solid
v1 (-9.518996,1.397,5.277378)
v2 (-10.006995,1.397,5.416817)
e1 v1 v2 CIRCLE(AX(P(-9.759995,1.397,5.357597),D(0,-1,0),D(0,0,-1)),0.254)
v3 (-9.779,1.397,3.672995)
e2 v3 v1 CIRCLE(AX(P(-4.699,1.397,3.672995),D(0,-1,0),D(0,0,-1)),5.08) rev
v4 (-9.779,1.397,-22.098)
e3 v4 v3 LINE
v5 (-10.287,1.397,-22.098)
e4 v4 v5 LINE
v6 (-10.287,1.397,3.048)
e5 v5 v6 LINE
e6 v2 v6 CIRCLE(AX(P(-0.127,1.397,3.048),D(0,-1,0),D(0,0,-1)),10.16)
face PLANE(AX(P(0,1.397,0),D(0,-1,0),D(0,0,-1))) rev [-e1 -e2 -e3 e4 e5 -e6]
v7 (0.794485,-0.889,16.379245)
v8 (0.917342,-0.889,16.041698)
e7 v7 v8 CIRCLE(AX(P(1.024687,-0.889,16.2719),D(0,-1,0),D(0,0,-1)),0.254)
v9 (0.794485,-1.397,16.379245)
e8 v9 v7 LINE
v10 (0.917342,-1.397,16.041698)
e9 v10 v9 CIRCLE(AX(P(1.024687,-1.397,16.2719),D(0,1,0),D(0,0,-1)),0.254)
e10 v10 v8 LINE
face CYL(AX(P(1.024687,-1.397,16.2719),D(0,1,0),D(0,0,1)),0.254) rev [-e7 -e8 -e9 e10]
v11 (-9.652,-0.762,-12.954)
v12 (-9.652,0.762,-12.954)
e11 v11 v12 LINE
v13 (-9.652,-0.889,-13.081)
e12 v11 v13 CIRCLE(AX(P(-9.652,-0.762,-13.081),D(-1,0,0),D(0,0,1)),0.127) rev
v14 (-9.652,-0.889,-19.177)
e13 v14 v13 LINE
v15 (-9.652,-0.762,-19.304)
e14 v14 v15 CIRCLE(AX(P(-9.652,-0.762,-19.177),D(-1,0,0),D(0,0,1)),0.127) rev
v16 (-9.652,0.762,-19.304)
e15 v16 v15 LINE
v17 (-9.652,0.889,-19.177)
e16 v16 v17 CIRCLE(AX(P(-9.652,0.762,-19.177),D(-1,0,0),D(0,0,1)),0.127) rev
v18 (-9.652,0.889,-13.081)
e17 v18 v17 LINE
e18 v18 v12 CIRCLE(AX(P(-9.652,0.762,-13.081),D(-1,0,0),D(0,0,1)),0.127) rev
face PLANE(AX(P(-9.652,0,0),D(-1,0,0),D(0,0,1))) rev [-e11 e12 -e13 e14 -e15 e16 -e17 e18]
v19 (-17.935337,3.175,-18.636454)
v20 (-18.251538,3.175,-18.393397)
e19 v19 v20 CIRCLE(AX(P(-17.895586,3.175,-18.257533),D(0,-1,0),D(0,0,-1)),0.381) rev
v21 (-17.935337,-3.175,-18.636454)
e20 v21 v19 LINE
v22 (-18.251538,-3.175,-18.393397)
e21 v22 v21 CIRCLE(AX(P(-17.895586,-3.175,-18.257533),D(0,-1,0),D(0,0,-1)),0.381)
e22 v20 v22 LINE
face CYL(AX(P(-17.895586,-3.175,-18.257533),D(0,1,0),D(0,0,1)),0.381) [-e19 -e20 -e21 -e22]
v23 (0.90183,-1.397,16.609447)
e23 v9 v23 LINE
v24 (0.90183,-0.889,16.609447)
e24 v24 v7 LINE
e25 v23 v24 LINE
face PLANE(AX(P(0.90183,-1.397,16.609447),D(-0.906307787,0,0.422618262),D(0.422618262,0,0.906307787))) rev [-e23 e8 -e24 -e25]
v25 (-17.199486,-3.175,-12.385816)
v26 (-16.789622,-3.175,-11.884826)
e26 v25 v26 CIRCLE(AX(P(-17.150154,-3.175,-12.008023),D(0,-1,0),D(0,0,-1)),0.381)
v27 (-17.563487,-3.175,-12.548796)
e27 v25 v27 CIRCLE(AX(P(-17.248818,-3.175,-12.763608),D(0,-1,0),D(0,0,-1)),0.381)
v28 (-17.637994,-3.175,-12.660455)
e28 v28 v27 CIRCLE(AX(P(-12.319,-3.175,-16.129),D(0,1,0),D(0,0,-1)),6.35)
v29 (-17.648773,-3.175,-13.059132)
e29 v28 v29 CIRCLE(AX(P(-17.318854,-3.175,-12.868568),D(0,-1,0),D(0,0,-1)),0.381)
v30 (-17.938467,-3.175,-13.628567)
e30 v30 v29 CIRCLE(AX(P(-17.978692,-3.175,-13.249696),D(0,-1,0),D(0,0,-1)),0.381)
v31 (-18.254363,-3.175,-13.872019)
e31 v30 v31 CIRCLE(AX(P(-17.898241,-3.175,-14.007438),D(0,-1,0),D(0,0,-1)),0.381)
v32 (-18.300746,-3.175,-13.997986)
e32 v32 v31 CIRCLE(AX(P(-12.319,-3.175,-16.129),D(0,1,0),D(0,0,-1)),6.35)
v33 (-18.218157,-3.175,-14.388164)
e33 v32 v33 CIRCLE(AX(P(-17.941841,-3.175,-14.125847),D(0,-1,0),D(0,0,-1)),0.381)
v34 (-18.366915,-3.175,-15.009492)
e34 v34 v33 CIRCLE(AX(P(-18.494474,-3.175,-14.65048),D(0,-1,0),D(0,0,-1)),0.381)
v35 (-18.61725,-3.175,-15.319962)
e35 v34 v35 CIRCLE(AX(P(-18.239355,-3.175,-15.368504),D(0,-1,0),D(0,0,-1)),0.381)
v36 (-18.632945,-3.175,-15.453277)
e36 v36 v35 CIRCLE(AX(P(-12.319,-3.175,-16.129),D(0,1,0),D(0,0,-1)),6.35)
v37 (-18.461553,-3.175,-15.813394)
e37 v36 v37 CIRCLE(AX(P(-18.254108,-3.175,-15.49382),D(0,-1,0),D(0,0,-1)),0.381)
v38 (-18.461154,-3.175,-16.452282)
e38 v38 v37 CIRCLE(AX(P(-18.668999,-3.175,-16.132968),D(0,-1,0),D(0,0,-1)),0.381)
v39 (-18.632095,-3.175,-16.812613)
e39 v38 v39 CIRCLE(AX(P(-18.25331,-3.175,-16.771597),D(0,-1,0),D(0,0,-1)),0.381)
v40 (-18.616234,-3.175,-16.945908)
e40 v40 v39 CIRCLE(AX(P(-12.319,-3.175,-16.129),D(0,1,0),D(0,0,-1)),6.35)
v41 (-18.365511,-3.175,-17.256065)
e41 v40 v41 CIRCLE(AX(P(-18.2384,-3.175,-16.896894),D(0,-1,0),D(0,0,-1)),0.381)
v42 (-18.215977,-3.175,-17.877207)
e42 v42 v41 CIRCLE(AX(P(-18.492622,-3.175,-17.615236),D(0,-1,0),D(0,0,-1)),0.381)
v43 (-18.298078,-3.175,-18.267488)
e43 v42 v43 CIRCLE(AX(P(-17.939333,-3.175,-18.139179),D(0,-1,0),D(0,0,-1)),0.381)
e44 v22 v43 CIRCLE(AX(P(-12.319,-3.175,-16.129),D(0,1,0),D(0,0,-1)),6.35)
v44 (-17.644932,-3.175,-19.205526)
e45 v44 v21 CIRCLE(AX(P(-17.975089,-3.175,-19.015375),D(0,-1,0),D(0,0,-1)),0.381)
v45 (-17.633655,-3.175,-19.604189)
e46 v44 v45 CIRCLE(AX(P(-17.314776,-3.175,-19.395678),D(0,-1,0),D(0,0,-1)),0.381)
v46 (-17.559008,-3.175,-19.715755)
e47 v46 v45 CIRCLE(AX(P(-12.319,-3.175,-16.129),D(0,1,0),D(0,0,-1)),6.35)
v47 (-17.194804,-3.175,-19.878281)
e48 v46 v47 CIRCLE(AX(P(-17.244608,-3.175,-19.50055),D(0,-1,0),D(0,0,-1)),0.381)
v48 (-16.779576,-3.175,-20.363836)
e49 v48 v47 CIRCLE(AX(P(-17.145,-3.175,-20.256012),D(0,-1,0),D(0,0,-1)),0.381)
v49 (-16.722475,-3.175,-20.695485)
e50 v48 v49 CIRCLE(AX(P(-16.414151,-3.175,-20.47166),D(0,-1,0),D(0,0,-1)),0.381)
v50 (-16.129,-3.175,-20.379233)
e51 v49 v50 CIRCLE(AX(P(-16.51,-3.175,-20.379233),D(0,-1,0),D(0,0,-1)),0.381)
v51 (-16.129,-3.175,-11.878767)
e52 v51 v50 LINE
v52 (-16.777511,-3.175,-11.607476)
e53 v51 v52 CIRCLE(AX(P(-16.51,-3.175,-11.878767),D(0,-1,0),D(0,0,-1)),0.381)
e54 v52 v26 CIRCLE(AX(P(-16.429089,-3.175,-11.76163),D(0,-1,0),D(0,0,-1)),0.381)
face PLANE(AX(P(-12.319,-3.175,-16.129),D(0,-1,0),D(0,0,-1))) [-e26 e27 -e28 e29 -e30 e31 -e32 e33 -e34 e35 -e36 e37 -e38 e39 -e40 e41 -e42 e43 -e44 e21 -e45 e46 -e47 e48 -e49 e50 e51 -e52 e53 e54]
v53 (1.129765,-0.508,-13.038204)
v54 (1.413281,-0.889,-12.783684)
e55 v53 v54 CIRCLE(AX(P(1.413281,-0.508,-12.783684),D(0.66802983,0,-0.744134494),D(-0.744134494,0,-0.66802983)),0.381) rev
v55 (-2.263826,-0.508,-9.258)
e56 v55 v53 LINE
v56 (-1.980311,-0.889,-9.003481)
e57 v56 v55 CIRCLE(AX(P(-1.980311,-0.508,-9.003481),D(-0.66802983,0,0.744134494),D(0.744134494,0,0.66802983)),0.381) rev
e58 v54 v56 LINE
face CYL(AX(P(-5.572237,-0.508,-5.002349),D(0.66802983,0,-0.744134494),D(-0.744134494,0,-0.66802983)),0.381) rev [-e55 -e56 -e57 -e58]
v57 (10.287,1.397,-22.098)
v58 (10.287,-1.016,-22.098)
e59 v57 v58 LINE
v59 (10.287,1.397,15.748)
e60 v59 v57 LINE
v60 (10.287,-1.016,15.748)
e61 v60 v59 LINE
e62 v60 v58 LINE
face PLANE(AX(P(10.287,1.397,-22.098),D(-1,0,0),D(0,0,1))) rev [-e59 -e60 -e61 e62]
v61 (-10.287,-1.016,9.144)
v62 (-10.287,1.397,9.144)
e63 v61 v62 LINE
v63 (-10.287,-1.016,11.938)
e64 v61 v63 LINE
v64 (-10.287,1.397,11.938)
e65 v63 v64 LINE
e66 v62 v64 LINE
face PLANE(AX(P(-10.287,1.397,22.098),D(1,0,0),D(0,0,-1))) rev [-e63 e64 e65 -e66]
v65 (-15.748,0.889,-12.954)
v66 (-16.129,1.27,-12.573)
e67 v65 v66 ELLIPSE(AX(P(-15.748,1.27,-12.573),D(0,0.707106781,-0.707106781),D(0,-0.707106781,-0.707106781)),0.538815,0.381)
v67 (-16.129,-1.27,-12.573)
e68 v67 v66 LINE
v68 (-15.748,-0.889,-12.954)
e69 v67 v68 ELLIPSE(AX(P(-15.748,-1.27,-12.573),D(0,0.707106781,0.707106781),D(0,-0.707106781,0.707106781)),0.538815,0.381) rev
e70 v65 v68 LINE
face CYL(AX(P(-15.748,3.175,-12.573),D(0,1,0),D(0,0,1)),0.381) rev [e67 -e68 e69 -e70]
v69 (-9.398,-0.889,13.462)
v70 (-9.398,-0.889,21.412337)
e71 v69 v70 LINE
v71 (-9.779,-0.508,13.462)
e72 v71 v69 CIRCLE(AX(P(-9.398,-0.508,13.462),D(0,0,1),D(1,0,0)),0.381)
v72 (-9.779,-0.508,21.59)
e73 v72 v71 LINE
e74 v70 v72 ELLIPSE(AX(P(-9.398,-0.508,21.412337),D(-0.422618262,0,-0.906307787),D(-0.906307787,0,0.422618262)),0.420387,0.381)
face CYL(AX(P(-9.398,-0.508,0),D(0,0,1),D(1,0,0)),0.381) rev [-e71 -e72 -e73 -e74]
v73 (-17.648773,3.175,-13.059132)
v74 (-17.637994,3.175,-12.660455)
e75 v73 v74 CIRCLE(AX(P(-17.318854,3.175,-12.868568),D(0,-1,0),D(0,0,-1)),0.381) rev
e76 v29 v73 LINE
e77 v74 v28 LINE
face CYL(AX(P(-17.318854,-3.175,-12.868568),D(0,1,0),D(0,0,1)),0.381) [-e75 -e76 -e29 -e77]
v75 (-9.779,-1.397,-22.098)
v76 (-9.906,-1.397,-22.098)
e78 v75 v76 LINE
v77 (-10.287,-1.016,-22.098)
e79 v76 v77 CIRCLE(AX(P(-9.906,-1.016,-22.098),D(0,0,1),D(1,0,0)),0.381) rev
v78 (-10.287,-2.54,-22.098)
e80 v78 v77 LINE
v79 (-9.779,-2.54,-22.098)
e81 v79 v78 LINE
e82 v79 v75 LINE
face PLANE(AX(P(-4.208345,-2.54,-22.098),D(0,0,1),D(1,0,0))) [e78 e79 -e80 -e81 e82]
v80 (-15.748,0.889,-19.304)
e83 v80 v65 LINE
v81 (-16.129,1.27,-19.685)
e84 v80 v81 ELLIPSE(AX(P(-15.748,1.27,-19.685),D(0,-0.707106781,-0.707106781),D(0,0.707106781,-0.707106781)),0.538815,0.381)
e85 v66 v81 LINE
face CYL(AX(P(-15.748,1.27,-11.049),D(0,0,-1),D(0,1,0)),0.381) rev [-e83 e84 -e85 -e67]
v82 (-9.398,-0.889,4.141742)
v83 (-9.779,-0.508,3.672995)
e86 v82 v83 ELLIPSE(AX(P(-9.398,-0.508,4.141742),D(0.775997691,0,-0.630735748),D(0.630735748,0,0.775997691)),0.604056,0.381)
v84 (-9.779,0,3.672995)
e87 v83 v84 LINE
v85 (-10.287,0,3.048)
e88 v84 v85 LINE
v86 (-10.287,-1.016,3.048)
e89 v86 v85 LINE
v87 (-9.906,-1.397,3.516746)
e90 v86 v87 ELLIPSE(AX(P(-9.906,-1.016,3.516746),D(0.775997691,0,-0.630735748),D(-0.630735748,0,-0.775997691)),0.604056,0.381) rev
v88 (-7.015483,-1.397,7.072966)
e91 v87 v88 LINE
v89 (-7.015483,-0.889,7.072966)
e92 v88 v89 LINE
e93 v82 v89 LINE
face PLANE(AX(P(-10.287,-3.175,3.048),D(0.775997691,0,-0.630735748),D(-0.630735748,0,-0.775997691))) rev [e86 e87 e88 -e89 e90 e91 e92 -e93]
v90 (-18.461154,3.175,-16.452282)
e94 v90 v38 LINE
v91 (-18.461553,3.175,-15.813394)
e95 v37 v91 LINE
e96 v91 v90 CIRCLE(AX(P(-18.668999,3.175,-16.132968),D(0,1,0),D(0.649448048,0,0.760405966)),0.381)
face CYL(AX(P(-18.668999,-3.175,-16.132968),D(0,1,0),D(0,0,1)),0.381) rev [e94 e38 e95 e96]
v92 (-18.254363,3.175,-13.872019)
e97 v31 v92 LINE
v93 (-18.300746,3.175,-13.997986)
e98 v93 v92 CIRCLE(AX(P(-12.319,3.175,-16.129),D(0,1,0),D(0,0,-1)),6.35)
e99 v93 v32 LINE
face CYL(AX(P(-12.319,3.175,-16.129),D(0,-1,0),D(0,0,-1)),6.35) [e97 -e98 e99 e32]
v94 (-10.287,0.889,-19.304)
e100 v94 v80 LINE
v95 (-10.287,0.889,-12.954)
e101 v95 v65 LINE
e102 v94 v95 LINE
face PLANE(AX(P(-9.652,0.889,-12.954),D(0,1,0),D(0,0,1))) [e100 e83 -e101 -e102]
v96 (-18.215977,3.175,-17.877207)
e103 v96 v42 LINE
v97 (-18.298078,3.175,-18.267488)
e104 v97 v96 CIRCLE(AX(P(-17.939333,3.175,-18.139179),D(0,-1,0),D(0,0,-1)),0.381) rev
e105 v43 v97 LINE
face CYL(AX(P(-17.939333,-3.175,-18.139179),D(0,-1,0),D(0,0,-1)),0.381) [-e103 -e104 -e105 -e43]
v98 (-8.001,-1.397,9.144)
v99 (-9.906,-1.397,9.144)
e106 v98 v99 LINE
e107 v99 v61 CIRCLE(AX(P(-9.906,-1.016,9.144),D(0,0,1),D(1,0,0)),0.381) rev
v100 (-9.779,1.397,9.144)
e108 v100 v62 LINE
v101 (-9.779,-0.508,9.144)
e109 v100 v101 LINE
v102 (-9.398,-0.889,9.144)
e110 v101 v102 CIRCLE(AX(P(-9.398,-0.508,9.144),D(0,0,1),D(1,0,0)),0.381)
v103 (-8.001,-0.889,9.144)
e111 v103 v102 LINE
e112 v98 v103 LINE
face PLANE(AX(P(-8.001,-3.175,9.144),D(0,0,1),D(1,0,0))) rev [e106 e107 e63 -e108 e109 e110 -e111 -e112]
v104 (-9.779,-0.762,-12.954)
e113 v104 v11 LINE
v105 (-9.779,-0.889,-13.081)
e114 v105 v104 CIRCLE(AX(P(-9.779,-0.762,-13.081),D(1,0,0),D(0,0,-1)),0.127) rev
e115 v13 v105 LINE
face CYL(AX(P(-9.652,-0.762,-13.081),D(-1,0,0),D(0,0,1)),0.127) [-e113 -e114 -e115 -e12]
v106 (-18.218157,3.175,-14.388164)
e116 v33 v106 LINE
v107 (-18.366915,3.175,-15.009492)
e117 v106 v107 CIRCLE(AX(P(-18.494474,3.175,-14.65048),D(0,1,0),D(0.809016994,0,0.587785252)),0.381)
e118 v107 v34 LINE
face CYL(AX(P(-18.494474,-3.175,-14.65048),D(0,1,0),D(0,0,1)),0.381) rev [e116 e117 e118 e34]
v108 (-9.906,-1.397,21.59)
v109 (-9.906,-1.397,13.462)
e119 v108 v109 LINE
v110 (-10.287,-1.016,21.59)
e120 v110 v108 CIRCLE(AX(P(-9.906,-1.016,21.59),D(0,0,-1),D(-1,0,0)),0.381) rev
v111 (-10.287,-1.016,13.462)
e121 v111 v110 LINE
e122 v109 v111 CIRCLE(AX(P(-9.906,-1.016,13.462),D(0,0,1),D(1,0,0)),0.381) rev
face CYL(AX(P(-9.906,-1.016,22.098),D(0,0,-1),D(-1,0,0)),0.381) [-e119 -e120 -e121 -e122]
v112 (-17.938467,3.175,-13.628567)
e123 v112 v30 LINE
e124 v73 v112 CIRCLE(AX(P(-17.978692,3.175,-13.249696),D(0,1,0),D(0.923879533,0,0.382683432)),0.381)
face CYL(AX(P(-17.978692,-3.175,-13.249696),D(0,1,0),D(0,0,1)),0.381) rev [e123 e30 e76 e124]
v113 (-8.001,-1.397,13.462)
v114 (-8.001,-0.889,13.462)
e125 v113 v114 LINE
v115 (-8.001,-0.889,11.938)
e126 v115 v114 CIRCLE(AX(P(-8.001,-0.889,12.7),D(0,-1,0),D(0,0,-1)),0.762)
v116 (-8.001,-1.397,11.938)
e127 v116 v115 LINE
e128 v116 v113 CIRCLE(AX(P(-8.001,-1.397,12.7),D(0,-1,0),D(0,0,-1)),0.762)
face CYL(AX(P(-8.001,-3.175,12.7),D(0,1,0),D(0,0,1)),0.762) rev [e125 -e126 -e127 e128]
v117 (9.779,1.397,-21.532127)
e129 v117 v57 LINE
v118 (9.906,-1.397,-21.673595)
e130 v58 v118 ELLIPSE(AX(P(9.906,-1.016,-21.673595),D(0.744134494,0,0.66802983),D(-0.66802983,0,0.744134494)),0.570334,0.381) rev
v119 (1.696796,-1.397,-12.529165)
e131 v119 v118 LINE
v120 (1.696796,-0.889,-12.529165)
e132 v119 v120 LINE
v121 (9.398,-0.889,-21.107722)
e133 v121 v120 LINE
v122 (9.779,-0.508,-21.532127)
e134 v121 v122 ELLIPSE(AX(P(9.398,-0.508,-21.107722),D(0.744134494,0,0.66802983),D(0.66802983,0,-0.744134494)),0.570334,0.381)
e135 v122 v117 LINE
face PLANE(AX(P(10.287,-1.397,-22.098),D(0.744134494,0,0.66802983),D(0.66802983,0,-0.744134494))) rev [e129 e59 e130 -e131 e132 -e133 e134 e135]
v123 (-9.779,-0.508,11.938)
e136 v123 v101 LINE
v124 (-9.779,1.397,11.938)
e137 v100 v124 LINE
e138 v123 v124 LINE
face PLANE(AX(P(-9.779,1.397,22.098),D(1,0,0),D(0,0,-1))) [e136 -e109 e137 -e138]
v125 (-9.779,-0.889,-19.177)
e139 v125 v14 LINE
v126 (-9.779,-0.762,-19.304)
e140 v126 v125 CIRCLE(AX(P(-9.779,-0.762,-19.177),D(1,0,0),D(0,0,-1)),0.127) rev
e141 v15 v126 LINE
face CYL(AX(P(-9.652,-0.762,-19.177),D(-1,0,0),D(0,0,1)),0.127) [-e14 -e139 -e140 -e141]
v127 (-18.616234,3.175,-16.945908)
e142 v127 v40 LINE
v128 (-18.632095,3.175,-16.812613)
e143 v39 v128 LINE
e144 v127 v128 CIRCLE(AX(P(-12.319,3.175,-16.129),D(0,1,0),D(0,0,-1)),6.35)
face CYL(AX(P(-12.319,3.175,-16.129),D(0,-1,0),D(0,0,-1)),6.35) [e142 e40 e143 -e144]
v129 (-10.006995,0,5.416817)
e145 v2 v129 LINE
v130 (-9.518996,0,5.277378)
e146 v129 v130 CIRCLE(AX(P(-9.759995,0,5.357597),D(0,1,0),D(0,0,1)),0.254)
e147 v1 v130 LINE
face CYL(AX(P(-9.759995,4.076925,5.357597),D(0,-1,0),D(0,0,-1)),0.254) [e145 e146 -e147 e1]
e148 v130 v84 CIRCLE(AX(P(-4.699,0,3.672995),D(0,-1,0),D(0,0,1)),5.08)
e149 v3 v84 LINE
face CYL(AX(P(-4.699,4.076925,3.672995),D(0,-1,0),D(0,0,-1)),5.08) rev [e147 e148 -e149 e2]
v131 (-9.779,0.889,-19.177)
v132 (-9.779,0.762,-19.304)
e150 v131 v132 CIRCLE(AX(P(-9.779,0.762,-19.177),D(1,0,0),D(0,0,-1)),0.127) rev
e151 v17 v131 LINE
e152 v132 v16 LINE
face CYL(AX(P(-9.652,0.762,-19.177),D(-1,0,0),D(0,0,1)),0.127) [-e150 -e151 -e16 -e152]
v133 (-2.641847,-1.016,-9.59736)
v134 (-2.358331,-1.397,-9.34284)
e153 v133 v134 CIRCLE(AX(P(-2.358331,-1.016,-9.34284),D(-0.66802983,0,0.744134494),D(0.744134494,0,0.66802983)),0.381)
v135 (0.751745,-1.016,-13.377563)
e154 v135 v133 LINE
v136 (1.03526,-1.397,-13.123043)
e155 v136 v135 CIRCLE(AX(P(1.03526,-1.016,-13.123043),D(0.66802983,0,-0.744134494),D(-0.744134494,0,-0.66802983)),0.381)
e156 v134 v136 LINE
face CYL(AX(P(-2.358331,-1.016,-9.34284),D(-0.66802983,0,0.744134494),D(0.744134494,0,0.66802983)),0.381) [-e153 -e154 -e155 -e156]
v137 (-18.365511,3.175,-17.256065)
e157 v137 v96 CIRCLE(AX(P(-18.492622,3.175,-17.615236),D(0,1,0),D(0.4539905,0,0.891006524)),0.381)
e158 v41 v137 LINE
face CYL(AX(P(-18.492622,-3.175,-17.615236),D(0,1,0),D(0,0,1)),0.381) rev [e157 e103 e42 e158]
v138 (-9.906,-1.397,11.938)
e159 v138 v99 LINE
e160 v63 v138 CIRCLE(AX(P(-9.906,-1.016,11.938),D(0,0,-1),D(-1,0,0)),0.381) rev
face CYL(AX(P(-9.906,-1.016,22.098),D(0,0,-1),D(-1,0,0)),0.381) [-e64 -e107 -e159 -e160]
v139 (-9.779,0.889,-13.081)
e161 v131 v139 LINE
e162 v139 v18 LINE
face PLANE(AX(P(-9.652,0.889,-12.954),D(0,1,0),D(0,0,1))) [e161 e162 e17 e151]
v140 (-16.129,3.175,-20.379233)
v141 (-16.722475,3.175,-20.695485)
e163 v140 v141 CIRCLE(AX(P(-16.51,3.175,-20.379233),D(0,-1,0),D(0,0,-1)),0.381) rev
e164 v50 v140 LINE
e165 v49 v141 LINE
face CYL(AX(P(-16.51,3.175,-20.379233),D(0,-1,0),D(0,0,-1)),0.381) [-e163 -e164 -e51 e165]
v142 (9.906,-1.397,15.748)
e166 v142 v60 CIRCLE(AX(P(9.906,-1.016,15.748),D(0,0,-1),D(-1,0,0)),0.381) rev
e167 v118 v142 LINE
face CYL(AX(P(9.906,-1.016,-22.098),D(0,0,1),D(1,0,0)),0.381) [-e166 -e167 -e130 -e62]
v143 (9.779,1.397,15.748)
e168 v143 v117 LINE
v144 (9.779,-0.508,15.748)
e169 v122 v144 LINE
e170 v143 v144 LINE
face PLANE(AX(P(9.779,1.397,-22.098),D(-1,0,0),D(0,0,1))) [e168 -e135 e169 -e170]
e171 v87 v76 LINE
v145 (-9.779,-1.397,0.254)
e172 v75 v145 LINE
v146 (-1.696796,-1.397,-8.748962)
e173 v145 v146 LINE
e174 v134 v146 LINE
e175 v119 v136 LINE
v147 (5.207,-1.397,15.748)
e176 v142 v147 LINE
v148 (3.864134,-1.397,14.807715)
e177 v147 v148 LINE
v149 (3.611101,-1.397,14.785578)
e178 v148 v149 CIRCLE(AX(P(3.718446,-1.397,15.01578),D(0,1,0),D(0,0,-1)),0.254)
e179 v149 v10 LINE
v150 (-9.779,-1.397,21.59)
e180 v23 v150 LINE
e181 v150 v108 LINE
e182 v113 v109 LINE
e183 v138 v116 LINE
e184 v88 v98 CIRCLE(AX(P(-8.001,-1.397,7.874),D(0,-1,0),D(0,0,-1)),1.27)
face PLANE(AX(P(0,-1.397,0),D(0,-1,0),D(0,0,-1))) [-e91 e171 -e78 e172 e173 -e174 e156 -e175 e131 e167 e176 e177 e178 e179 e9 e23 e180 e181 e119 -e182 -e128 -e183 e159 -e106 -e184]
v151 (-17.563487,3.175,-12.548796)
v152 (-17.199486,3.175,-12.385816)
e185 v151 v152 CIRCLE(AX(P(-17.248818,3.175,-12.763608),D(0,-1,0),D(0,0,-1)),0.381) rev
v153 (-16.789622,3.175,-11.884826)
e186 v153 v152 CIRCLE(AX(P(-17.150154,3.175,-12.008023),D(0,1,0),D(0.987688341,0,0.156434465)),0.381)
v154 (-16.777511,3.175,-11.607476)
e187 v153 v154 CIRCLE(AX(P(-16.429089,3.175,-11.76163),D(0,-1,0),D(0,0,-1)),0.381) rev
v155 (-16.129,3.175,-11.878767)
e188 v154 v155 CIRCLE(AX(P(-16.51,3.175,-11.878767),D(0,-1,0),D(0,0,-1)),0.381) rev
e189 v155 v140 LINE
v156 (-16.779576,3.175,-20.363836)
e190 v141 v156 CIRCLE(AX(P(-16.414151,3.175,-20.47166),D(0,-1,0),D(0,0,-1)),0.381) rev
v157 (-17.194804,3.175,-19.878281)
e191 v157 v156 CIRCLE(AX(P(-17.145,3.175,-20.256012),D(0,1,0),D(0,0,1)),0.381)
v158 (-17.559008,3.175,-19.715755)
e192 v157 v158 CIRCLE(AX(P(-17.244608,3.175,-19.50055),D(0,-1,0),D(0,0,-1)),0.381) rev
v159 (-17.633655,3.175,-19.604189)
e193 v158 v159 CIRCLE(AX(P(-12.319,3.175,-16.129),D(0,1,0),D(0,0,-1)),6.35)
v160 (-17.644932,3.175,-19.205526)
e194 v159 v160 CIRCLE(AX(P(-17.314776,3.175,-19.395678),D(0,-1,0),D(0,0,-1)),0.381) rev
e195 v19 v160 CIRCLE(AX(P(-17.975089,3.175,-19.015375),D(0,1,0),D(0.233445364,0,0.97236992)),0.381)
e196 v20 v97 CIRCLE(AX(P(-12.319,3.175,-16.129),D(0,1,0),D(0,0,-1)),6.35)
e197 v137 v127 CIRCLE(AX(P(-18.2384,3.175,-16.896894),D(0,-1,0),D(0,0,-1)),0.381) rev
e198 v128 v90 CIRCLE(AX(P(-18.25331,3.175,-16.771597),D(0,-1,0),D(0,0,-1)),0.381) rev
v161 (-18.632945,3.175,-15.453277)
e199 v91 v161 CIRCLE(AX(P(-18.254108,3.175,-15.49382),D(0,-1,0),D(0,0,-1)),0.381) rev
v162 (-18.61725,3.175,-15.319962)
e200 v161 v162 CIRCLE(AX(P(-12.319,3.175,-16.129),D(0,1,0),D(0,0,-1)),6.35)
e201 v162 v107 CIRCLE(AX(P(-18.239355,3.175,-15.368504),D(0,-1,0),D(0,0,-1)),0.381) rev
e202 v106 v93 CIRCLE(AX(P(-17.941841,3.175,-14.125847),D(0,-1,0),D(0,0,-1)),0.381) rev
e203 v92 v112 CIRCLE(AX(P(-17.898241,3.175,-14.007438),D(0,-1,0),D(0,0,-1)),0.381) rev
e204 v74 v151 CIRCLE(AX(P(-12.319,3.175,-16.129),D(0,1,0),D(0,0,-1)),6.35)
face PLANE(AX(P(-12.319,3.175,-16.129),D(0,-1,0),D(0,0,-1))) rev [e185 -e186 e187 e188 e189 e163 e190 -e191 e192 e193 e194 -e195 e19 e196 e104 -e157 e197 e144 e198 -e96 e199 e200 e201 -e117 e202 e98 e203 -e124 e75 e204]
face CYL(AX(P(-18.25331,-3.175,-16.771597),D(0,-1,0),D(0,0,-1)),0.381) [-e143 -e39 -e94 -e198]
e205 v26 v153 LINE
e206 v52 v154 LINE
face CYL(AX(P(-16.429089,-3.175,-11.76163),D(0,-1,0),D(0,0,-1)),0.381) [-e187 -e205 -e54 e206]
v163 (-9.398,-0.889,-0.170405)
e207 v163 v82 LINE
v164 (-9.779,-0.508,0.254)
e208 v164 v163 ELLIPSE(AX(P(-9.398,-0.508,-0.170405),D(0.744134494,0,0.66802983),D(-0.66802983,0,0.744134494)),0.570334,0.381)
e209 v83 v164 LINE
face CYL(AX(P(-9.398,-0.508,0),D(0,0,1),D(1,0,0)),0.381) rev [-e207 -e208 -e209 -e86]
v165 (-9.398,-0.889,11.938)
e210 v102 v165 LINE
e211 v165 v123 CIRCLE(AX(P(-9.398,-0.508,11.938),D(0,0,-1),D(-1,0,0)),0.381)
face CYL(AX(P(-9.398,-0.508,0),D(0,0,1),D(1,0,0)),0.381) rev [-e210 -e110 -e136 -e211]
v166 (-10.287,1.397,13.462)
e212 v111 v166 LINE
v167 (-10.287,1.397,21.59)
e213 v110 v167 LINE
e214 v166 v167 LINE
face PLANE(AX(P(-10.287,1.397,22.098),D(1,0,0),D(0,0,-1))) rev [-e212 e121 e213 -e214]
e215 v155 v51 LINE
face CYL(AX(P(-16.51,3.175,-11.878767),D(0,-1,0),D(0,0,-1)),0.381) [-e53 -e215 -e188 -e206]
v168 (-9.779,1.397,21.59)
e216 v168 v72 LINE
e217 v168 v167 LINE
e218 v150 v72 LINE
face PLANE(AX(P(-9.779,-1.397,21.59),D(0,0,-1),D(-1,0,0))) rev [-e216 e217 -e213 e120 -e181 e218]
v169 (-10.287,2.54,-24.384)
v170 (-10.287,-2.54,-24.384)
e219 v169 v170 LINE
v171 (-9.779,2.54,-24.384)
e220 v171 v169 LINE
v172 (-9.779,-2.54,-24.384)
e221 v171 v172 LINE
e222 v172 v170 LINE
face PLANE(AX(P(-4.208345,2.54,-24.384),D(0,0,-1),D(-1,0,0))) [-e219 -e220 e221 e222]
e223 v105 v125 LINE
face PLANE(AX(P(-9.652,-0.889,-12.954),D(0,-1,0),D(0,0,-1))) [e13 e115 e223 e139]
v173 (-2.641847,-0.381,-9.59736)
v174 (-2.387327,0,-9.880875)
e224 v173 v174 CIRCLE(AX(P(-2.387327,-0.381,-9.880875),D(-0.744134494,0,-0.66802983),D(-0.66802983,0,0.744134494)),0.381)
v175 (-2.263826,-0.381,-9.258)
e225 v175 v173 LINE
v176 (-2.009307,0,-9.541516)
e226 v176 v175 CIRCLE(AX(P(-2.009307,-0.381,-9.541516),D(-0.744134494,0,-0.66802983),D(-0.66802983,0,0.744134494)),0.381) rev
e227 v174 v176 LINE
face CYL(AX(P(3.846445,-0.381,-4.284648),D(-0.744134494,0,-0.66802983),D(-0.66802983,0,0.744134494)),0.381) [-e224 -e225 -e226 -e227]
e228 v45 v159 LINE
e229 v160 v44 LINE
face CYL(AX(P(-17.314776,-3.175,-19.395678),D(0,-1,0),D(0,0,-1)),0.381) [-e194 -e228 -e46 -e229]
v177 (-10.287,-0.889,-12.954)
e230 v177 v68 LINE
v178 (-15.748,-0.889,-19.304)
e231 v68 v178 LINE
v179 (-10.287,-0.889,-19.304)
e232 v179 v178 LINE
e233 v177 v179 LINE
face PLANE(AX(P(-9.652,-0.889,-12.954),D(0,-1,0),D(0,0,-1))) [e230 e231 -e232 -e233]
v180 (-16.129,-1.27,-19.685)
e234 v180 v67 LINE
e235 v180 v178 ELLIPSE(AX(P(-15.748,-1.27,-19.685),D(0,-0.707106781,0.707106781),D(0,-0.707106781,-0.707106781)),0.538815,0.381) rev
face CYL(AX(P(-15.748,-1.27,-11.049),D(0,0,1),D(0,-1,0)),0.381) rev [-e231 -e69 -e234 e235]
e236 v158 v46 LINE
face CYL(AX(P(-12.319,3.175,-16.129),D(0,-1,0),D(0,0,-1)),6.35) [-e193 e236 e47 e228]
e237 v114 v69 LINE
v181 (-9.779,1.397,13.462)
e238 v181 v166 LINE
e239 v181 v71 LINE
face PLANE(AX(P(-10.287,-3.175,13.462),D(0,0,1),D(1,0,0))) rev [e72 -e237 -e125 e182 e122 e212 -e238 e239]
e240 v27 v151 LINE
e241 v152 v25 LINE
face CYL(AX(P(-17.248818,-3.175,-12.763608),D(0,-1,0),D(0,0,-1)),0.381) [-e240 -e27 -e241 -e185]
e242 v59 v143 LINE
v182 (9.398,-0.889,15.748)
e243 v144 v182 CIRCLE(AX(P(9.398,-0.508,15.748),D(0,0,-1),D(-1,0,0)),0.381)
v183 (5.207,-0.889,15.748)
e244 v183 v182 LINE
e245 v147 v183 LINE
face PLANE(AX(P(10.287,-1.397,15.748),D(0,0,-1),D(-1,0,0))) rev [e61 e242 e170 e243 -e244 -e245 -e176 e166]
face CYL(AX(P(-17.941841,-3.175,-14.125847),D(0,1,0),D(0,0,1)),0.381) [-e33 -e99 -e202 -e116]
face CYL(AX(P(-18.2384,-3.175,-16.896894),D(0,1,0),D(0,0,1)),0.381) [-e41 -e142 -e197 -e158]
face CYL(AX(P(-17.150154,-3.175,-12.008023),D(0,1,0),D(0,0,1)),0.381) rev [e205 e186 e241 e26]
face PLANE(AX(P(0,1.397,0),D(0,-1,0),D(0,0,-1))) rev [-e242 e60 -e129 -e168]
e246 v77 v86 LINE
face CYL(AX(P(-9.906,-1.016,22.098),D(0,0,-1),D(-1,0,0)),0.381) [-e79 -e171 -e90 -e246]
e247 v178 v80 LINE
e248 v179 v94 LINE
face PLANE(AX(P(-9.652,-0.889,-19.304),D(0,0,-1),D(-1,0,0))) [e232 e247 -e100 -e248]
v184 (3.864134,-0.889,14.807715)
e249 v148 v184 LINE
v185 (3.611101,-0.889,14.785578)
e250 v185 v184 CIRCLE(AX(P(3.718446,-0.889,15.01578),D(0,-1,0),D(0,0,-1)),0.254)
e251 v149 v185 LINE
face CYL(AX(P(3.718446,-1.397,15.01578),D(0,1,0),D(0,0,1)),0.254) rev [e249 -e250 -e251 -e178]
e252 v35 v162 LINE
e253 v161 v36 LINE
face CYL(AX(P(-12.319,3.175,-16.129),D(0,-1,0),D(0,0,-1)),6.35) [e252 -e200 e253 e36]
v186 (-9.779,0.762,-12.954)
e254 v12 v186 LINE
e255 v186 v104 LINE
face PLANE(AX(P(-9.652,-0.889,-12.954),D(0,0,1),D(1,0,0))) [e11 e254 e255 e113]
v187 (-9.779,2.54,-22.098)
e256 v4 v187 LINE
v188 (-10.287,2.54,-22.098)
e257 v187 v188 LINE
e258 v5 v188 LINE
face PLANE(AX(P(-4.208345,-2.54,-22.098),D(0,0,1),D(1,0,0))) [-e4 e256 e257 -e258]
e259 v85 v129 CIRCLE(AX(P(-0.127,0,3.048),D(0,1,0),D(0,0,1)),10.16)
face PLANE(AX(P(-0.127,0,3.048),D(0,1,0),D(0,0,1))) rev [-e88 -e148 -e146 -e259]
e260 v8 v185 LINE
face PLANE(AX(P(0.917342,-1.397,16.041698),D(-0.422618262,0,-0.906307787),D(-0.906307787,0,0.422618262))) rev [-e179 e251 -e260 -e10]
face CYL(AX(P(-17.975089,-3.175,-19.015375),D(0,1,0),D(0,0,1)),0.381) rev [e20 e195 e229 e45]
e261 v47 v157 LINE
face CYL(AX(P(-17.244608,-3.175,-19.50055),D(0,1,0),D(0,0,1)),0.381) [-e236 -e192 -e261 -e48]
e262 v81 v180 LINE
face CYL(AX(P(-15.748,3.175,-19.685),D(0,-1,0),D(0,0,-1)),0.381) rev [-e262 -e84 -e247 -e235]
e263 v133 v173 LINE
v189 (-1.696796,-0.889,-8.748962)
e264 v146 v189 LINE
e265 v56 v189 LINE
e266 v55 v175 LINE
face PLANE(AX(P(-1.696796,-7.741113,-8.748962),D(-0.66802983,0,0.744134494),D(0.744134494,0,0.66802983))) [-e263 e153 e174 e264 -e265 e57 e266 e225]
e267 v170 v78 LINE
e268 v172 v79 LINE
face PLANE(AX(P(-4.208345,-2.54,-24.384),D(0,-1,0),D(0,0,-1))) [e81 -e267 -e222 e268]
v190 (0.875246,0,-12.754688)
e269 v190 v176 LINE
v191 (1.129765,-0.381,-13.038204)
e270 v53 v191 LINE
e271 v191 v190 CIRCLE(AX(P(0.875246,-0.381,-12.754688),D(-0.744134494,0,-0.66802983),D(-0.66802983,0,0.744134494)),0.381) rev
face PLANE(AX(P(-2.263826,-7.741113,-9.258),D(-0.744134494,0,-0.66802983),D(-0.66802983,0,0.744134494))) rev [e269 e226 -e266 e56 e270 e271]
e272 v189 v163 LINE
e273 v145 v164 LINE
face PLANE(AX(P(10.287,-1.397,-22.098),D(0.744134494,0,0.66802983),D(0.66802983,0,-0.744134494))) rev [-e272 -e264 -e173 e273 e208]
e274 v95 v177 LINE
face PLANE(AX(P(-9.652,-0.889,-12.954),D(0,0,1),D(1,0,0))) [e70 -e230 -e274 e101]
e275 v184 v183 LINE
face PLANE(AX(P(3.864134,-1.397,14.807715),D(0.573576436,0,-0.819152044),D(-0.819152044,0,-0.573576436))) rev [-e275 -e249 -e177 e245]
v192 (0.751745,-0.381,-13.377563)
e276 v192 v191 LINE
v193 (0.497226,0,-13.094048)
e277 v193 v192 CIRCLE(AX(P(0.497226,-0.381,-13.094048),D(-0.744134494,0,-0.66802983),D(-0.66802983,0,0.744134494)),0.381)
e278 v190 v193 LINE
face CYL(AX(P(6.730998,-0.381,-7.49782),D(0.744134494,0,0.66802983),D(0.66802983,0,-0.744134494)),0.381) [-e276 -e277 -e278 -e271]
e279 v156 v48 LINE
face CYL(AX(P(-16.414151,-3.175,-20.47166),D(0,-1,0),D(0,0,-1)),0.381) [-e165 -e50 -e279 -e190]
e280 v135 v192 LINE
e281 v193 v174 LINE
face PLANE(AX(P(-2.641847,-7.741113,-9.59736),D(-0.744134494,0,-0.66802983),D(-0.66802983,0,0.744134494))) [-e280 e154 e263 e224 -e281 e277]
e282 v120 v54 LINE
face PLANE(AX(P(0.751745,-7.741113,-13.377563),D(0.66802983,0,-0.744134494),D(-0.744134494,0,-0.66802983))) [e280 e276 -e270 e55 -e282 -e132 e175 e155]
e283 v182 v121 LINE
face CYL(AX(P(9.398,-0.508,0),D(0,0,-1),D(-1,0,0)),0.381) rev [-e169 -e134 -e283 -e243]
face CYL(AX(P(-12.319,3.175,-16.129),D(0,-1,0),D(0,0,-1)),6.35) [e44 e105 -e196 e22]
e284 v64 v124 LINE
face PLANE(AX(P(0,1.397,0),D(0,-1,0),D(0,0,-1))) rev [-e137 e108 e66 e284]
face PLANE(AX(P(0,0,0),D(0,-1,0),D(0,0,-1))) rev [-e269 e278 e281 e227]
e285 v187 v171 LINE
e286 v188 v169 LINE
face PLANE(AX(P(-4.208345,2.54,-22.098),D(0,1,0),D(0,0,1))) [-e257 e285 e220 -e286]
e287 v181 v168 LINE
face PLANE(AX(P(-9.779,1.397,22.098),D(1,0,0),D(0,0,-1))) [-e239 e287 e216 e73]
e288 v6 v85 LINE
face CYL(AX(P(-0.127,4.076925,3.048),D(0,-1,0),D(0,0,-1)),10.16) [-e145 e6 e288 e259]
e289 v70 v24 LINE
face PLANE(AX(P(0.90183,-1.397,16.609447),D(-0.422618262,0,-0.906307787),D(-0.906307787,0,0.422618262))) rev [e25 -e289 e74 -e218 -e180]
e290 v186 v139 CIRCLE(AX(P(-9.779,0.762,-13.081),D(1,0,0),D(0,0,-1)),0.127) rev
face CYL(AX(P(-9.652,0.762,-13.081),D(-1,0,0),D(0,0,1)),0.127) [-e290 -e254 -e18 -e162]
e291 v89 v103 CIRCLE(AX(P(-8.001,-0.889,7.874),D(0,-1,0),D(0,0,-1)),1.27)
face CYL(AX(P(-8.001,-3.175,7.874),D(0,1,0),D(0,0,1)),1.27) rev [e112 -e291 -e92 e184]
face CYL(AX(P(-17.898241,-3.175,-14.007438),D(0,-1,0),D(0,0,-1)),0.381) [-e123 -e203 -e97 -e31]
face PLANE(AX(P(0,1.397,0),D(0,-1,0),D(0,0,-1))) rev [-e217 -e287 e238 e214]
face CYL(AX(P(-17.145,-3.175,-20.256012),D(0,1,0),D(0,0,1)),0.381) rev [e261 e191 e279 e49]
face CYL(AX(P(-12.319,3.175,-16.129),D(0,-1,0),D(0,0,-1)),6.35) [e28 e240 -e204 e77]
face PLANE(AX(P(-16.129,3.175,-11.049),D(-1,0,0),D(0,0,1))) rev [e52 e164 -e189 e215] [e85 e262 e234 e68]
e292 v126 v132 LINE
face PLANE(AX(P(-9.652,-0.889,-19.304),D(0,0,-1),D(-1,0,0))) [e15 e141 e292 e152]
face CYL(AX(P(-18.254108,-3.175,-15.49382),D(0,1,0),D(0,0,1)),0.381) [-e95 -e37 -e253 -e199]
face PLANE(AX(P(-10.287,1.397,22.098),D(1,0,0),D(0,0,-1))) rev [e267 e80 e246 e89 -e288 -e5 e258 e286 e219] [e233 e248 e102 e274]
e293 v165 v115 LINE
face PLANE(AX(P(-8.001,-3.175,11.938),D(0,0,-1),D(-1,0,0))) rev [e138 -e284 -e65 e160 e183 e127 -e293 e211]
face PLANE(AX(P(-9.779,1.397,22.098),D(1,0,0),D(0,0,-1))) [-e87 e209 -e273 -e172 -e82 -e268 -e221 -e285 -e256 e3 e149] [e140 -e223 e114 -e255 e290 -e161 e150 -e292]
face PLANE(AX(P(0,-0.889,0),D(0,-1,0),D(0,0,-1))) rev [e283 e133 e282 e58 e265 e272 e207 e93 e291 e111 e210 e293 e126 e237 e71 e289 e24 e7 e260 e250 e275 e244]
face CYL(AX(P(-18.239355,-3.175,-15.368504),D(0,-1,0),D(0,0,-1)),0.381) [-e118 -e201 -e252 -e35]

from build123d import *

# Parameters (mm, degrees)
SKETCH1_W                = 20.574
SKETCH1_H                = 44.196
BOSS_EXTRUDE1_DEPTH      = 1.397
SHELL1_T                 = -0.508
CUT_EXTRUDE1_DEPTH       = 25.415068749
CUT_EXTRUDE1_DEPTH_BACK  = 25.415068749
CUT_EXTRUDE2_DEPTH       = 25.415068749
CUT_EXTRUDE2_DEPTH_BACK  = 25.415068749
SKETCH5_W                = 2.286
SKETCH5_H                = 5.08
BOSS_EXTRUDE2_DEPTH      = 0.508
BOSS_EXTRUDE3_DEPTH      = 5.842
BOSS_EXTRUDE3_DEPTH_BACK = 0.635
SKETCH6_W                = 6.35
SKETCH6_H                = 1.778
BOSS_EXTRUDE4_DEPTH      = 3.175
SKETCH8_R                = 0.381
CUT_EXTRUDE3_DEPTH       = 31.873801871
FILLET1_R                = 0.381
CIRPATTERN1_START        = -3.175
CIRPATTERN1_DEPTH        = 6.35
CUT_EXTRUDE4_DEPTH       = 31.853319649
CUT_EXTRUDE4_DEPTH_BACK  = 31.853319649
BOSS_EXTRUDE5_DEPTH      = 1.397
BOSS_EXTRUDE6_REACH      = 32.853
SHELL2_START             = -7.869211645
SHELL2_OUTLINE_W         = 5.08
SHELL2_OUTLINE_H         = 0.889
SHELL2_DEPTH             = 0.762
FILLET2_R                = 0.381
FILLET6_R                = 0.127


# Read off the part's stored shape, not the designer's step: CirPattern1, Shell2
with BuildPart() as part:
    # Sketch1 → Boss-Extrude1 (new, symmetric)
    with BuildSketch(Plane(origin=(0, 0, 0), x_dir=(1, 0, 0), z_dir=(0, 1, 0))):
        Rectangle(SKETCH1_W, SKETCH1_H)
    extrude(amount=BOSS_EXTRUDE1_DEPTH, both=True)

    # Shell1
    shell1_openings = [part.faces().sort_by_distance(p)[0] for p in [
        (0, 1.397, 0),
    ]]
    offset(amount=SHELL1_T, openings=shell1_openings, kind=Kind.INTERSECTION)

    # Sketch3 → Cut-Extrude1 (cut, two sides: drawn at the far end of the back side and taken through both)
    with BuildSketch(Plane(origin=(0, 0, 0), x_dir=(1, 0, 0), z_dir=(0, 1, 0)).offset(-CUT_EXTRUDE1_DEPTH_BACK)):
        Polygon((10.287, 22.098), (-9.779, -0.254), (-9.779, 22.098), align=None)
    extrude(amount=CUT_EXTRUDE1_DEPTH + CUT_EXTRUDE1_DEPTH_BACK, mode=Mode.SUBTRACT)

    # Sketch4 → Cut-Extrude2 (cut, two sides: drawn at the far end of the back side and taken through both)
    with BuildSketch(Plane(origin=(0, 0, 0), x_dir=(1, 0, 0), z_dir=(0, 1, 0)).offset(-CUT_EXTRUDE2_DEPTH_BACK)):
        with BuildLine():
            Line((-10.287, -22.098), (10.287, -22.098))
            Line((10.287, -22.098), (10.287, -15.748))
            Line((10.287, -15.748), (5.207, -15.748))
            Line((5.207, -15.748), (3.864134037, -14.80771513))
            ThreePointArc((3.864134037, -14.80771513), (3.740583181, -14.762746296), (3.611100584, -14.785577571))
            Line((3.611100584, -14.785577571), (0.917342395, -16.041697644))
            ThreePointArc((0.917342395, -16.041697644), (0.786005508, -16.185026705), (0.794485256, -16.37924486))
            Line((0.794485256, -16.37924486), (0.901830294, -16.609447038))
            Line((0.901830294, -16.609447038), (-9.779, -21.59))
            Line((-9.779, -21.59), (-10.287, -21.59))
            Line((-10.287, -21.59), (-10.287, -22.098))
        make_face()
    extrude(amount=CUT_EXTRUDE2_DEPTH + CUT_EXTRUDE2_DEPTH_BACK, mode=Mode.SUBTRACT)

    # Sketch5 → Boss-Extrude2 (add)
    with BuildSketch(Plane.ZY.offset(10.287)):
        with Locations((-23.241, 0)):
            Rectangle(SKETCH5_W, SKETCH5_H)
    extrude(amount=-BOSS_EXTRUDE2_DEPTH)

    # Sketch6 → Boss-Extrude3 (add, two sides: drawn at the far end of the back side and taken through both)
    with BuildSketch(Plane.ZY.offset(10.287).offset(-BOSS_EXTRUDE3_DEPTH_BACK)):
        with Locations((-16.129, 0)):
            Rectangle(SKETCH6_W, SKETCH6_H)
    extrude(amount=BOSS_EXTRUDE3_DEPTH + BOSS_EXTRUDE3_DEPTH_BACK)

    # Sketch7 → Boss-Extrude4 (add, symmetric)
    with BuildSketch(Plane(origin=(0, 0, 0), x_dir=(1, 0, 0), z_dir=(0, 1, 0))):
        with BuildLine():
            Line((-16.129, 11.049), (-16.129, 21.209))
            ThreePointArc((-16.129, 21.209), (-18.669, 16.129), (-16.129, 11.049))
        make_face()
    extrude(amount=BOSS_EXTRUDE4_DEPTH, both=True)

    # Sketch8 → Cut-Extrude3 (cut, symmetric)
    with BuildSketch(Plane(origin=(0, 0, 0), x_dir=(1, 0, 0), z_dir=(0, 1, 0))):
        with Locations((-17.145, 20.25601151)):
            Circle(SKETCH8_R)
    extrude(amount=CUT_EXTRUDE3_DEPTH, both=True, mode=Mode.SUBTRACT)

    # Fillet1
    # the kernel refuses this fillet: 0.381 mm, written as the material it takes off along each edge
    with BuildSketch(Plane(origin=(-16.129, -5.314598451, -21.209), x_dir=(0, 0, 1), z_dir=(0, 1, 0))) as fillet1_piece_1:
        with BuildLine():
            CenterArc((0.829767065, -0.381), FILLET1_R, 90, 134.597956661)
            ThreePointArc((0.558475601, -0.648510638), (0.268299759, -0.333674793), (0, 0))
            Line((0, 0), (0.829767065, 0))
        make_face()
    extrude(amount=10.629196903, mode=Mode.SUBTRACT)
    with BuildSketch(Plane(origin=(-16.888803964, -3.924719523, -20.538012558), x_dir=(0.5312847358041962, 0, 0.8471933247502991), z_dir=(0, 1, 0))) as fillet1_piece_2:
        with BuildLine():
            CenterArc((0.308389086, 0.366870424), FILLET1_R, 191.227508383, 63.119725462)
            ThreePointArc((-0.065319255, 0.292687706), (-0.034387693, 0.1459582), (0, 0))
            ThreePointArc((0, 0), (0.102796362, 0.014129576), (0.205592724, 0))
        make_face()
    extrude(amount=7.849439047, mode=Mode.SUBTRACT)
    with BuildSketch(Plane(origin=(-17.383822436, -3.924719523, -19.95915322), x_dir=(0.919383333537804, 0, 0.39336279185112943), z_dir=(0, 1, 0))) as fillet1_piece_3:
        with BuildLine():
            CenterArc((0.308389086, -0.366870424), FILLET1_R, 105.652766155, 63.119725462)
            ThreePointArc((-0.065319255, -0.292687706), (-0.034387693, -0.1459582), (0, 0))
            ThreePointArc((0, 0), (0.102796362, -0.014129576), (0.205592724, 0))
        make_face()
    extrude(amount=7.849439047, mode=Mode.SUBTRACT)

    # CirPattern1 outline → CirPattern1 (cut)
    with BuildSketch(Plane(origin=(0, 0, 0), x_dir=(1, 0, 0), z_dir=(0, 1, 0)).offset(CIRPATTERN1_START)):
        with BuildLine():
            ThreePointArc((-16.777510638, 11.607475601), (-16.809726428, 11.745008607), (-16.789621511, 11.884826264))
            ThreePointArc((-16.789621511, 11.884826264), (-16.855265692, 12.249273725), (-17.19948569, 12.38581567))
            ThreePointArc((-17.19948569, 12.38581567), (-17.404514793, 12.415873831), (-17.563486704, 12.548796206))
            ThreePointArc((-17.563486704, 12.548796206), (-17.193275379, 12.059117997), (-16.777510638, 11.607475601))
        make_face()
        with BuildLine():
            ThreePointArc((-16.129, 11.878767065), (-16.36296353, 11.527282675), (-16.777510638, 11.607475601))
            ThreePointArc((-16.777510638, 11.607475601), (-16.462674793, 11.317299759), (-16.129, 11.049))
            Line((-16.129, 11.049), (-16.129, 11.878767065))
        make_face()
        with BuildLine():
            ThreePointArc((-17.633655181, 19.604189248), (-17.975088939, 19.015374527), (-18.251537846, 18.393397205))
            ThreePointArc((-18.251537846, 18.393397205), (-18.127780644, 18.559603646), (-17.935337257, 18.63645395))
            ThreePointArc((-17.935337257, 18.63645395), (-17.635723603, 18.842192055), (-17.644932405, 19.20552621))
            ThreePointArc((-17.644932405, 19.20552621), (-17.695623525, 19.406451162), (-17.633655181, 19.604189248))
        make_face()
        with BuildLine():
            ThreePointArc((-18.298077653, 18.26748788), (-18.492621503, 17.615236028), (-18.616234382, 16.945908274))
            ThreePointArc((-18.616234382, 16.945908274), (-18.534696725, 17.136412963), (-18.365510912, 17.256064903))
            ThreePointArc((-18.365510912, 17.256064903), (-18.122204213, 17.526061867), (-18.215977249, 17.877207318))
            ThreePointArc((-18.215977249, 17.877207318), (-18.312172768, 18.060747091), (-18.298077653, 18.26748788))
        make_face()
        with BuildLine():
            ThreePointArc((-18.632095343, 16.812613331), (-18.66899876, 16.132967891), (-18.632944744, 15.453276862))
            ThreePointArc((-18.632944744, 15.453276862), (-18.598132415, 15.657552479), (-18.46155341, 15.81339407))
            ThreePointArc((-18.46155341, 15.81339407), (-18.287998835, 16.132729817), (-18.461154191, 16.452282211))
            ThreePointArc((-18.461154191, 16.452282211), (-18.59753833, 16.608294367), (-18.632095343, 16.812613331))
        make_face()
        with BuildLine():
            ThreePointArc((-18.617250379, 15.319962201), (-18.494474074, 14.650480486), (-18.300745514, 13.997986017))
            ThreePointArc((-18.300745514, 13.997986017), (-18.314582249, 14.20474426), (-18.218157429, 14.388163671))
            ThreePointArc((-18.218157429, 14.388163671), (-18.12394563, 14.739191657), (-18.366914716, 15.009492478))
            ThreePointArc((-18.366914716, 15.009492478), (-18.535950864, 15.129355761), (-18.617250379, 15.319962201))
        make_face()
        with BuildLine():
            ThreePointArc((-18.254363096, 13.872018629), (-17.978691709, 13.249696306), (-17.637994075, 12.660455345))
            ThreePointArc((-17.637994075, 12.660455345), (-17.699715253, 12.85827072), (-17.64877307, 13.059132165))
            ThreePointArc((-17.64877307, 13.059132165), (-17.639110206, 13.422454528), (-17.93846651, 13.628566908))
            ThreePointArc((-17.93846651, 13.628566908), (-18.130813704, 13.705657654), (-18.254363096, 13.872018629))
        make_face()
    extrude(amount=CIRPATTERN1_DEPTH, mode=Mode.SUBTRACT)

    # Sketch9 → Cut-Extrude4 (cut, two sides: drawn at the far end of the back side and taken through both)
    with BuildSketch(Plane(origin=(0, 0, 0), x_dir=(1, 0, 0), z_dir=(0, 1, 0)).offset(-CUT_EXTRUDE4_DEPTH_BACK)):
        with BuildLine():
            Line((-8.001, -11.938), (-10.287, -11.938))
            Line((-10.287, -11.938), (-10.287, -13.462))
            Line((-10.287, -13.462), (-8.001, -13.462))
            ThreePointArc((-8.001, -13.462), (-7.239, -12.7), (-8.001, -11.938))
        make_face()
        with BuildLine():
            Line((-8.001, -9.144), (-10.287, -9.144))
            Line((-10.287, -9.144), (-10.287, -3.048))
            Line((-10.287, -3.048), (-7.015482933, -7.0729656))
            ThreePointArc((-7.015482933, -7.0729656), (-6.854218921, -8.419704275), (-8.001, -9.144))
        make_face()
    extrude(amount=CUT_EXTRUDE4_DEPTH + CUT_EXTRUDE4_DEPTH_BACK, mode=Mode.SUBTRACT)

    # Sketch10 → Boss-Extrude5 (add)
    with BuildSketch(Plane(origin=(0, 0, 0), x_dir=(1, 0, 0), z_dir=(0, 1, 0))):
        with BuildLine():
            Line((-10.287, -3.048), (-9.779, -3.672995219))
            ThreePointArc((-9.779, -3.672995219), (-9.713577615, -4.485652185), (-9.518995533, -5.277377672))
            ThreePointArc((-9.518995533, -5.277377672), (-9.690211017, -5.601822413), (-10.00699519, -5.416817226))
            ThreePointArc((-10.00699519, -5.416817226), (-10.216755971, -4.240654366), (-10.287, -3.048))
        make_face()
    extrude(amount=BOSS_EXTRUDE5_DEPTH)

    # Boss-Extrude6: up to this face of the body (flat: up to its plane)
    boss_extrude6_end = Plane(part.part.faces().sort_by_distance((1.063267264, -1.397, 2.310847226))[0])
    # Sketch11 → Boss-Extrude6 (add, up to the picked face)
    with BuildSketch(Plane(origin=(0, 0, 0), x_dir=(1, 0, 0), z_dir=(0, 1, 0)), mode=Mode.PRIVATE) as boss_extrude6_sk1:
        Polygon((-1.696795769, 8.748961675), (-2.641846577, 9.59735956), (0.751744961, 13.377562792), (1.696795769, 12.529164907), align=None)
    boss_extrude6_tool1 = split(extrude(boss_extrude6_sk1.sketch, amount=-BOSS_EXTRUDE6_REACH, mode=Mode.PRIVATE), bisect_by=boss_extrude6_end, keep=Keep.BOTH, mode=Mode.PRIVATE)
    add(boss_extrude6_tool1.solids().sort_by(Axis((-0.472525, 0, -11.063262), (0, -1, 0)))[0])

    # Shell2 outline → Shell2 (cut)
    with BuildSketch(Plane(origin=(0, 0, 0), x_dir=(0.668029830269147, 0, -0.7441344944770231), z_dir=(0.7441344944770231, 0, 0.6680298302691471)).offset(SHELL2_START)):
        with Locations((7.916893984, -0.4445)):
            Rectangle(SHELL2_OUTLINE_W, SHELL2_OUTLINE_H)
    extrude(amount=SHELL2_DEPTH, mode=Mode.SUBTRACT)

    # Fillet2
    fillet2_edges = [part.edges().sort_by_distance(p)[0] for p in [
        (-16.129, 0, -19.304),
        (-16.129, -0.889, -16.129),
        (-16.129, 0, -12.954),
        (-16.129, 0.889, -16.129),
        (-9.779, -0.889, 1.963497609),
        (-9.779, -0.889, 10.541),
        (-9.779, -0.889, 17.526),
        (-10.287, -1.397, 10.541),
        (-10.287, -1.397, 17.526),
        (0.940755122, 0, -13.207883215),
        (-2.452836415, 0, -9.427679983),
        (-0.945050808, -1.397, -11.487461176),
        (-0.567030485, -0.889, -11.148102022),
        (9.779, -0.889, -2.892063291),
        (10.287, -1.397, -3.175),
        (-10.287, -1.397, -9.525),
    ]]
    fillet(fillet2_edges, radius=FILLET2_R)

    # Fillet6
    fillet6_edges = [part.edges().sort_by_distance(p)[0] for p in [
        (-9.7155, -0.889, -19.304),
        (-9.7155, 0.889, -19.304),
        (-9.7155, 0.889, -12.954),
        (-9.7155, -0.889, -12.954),
    ]]
    fillet(fillet6_edges, radius=FILLET6_R)


solid = part.part
